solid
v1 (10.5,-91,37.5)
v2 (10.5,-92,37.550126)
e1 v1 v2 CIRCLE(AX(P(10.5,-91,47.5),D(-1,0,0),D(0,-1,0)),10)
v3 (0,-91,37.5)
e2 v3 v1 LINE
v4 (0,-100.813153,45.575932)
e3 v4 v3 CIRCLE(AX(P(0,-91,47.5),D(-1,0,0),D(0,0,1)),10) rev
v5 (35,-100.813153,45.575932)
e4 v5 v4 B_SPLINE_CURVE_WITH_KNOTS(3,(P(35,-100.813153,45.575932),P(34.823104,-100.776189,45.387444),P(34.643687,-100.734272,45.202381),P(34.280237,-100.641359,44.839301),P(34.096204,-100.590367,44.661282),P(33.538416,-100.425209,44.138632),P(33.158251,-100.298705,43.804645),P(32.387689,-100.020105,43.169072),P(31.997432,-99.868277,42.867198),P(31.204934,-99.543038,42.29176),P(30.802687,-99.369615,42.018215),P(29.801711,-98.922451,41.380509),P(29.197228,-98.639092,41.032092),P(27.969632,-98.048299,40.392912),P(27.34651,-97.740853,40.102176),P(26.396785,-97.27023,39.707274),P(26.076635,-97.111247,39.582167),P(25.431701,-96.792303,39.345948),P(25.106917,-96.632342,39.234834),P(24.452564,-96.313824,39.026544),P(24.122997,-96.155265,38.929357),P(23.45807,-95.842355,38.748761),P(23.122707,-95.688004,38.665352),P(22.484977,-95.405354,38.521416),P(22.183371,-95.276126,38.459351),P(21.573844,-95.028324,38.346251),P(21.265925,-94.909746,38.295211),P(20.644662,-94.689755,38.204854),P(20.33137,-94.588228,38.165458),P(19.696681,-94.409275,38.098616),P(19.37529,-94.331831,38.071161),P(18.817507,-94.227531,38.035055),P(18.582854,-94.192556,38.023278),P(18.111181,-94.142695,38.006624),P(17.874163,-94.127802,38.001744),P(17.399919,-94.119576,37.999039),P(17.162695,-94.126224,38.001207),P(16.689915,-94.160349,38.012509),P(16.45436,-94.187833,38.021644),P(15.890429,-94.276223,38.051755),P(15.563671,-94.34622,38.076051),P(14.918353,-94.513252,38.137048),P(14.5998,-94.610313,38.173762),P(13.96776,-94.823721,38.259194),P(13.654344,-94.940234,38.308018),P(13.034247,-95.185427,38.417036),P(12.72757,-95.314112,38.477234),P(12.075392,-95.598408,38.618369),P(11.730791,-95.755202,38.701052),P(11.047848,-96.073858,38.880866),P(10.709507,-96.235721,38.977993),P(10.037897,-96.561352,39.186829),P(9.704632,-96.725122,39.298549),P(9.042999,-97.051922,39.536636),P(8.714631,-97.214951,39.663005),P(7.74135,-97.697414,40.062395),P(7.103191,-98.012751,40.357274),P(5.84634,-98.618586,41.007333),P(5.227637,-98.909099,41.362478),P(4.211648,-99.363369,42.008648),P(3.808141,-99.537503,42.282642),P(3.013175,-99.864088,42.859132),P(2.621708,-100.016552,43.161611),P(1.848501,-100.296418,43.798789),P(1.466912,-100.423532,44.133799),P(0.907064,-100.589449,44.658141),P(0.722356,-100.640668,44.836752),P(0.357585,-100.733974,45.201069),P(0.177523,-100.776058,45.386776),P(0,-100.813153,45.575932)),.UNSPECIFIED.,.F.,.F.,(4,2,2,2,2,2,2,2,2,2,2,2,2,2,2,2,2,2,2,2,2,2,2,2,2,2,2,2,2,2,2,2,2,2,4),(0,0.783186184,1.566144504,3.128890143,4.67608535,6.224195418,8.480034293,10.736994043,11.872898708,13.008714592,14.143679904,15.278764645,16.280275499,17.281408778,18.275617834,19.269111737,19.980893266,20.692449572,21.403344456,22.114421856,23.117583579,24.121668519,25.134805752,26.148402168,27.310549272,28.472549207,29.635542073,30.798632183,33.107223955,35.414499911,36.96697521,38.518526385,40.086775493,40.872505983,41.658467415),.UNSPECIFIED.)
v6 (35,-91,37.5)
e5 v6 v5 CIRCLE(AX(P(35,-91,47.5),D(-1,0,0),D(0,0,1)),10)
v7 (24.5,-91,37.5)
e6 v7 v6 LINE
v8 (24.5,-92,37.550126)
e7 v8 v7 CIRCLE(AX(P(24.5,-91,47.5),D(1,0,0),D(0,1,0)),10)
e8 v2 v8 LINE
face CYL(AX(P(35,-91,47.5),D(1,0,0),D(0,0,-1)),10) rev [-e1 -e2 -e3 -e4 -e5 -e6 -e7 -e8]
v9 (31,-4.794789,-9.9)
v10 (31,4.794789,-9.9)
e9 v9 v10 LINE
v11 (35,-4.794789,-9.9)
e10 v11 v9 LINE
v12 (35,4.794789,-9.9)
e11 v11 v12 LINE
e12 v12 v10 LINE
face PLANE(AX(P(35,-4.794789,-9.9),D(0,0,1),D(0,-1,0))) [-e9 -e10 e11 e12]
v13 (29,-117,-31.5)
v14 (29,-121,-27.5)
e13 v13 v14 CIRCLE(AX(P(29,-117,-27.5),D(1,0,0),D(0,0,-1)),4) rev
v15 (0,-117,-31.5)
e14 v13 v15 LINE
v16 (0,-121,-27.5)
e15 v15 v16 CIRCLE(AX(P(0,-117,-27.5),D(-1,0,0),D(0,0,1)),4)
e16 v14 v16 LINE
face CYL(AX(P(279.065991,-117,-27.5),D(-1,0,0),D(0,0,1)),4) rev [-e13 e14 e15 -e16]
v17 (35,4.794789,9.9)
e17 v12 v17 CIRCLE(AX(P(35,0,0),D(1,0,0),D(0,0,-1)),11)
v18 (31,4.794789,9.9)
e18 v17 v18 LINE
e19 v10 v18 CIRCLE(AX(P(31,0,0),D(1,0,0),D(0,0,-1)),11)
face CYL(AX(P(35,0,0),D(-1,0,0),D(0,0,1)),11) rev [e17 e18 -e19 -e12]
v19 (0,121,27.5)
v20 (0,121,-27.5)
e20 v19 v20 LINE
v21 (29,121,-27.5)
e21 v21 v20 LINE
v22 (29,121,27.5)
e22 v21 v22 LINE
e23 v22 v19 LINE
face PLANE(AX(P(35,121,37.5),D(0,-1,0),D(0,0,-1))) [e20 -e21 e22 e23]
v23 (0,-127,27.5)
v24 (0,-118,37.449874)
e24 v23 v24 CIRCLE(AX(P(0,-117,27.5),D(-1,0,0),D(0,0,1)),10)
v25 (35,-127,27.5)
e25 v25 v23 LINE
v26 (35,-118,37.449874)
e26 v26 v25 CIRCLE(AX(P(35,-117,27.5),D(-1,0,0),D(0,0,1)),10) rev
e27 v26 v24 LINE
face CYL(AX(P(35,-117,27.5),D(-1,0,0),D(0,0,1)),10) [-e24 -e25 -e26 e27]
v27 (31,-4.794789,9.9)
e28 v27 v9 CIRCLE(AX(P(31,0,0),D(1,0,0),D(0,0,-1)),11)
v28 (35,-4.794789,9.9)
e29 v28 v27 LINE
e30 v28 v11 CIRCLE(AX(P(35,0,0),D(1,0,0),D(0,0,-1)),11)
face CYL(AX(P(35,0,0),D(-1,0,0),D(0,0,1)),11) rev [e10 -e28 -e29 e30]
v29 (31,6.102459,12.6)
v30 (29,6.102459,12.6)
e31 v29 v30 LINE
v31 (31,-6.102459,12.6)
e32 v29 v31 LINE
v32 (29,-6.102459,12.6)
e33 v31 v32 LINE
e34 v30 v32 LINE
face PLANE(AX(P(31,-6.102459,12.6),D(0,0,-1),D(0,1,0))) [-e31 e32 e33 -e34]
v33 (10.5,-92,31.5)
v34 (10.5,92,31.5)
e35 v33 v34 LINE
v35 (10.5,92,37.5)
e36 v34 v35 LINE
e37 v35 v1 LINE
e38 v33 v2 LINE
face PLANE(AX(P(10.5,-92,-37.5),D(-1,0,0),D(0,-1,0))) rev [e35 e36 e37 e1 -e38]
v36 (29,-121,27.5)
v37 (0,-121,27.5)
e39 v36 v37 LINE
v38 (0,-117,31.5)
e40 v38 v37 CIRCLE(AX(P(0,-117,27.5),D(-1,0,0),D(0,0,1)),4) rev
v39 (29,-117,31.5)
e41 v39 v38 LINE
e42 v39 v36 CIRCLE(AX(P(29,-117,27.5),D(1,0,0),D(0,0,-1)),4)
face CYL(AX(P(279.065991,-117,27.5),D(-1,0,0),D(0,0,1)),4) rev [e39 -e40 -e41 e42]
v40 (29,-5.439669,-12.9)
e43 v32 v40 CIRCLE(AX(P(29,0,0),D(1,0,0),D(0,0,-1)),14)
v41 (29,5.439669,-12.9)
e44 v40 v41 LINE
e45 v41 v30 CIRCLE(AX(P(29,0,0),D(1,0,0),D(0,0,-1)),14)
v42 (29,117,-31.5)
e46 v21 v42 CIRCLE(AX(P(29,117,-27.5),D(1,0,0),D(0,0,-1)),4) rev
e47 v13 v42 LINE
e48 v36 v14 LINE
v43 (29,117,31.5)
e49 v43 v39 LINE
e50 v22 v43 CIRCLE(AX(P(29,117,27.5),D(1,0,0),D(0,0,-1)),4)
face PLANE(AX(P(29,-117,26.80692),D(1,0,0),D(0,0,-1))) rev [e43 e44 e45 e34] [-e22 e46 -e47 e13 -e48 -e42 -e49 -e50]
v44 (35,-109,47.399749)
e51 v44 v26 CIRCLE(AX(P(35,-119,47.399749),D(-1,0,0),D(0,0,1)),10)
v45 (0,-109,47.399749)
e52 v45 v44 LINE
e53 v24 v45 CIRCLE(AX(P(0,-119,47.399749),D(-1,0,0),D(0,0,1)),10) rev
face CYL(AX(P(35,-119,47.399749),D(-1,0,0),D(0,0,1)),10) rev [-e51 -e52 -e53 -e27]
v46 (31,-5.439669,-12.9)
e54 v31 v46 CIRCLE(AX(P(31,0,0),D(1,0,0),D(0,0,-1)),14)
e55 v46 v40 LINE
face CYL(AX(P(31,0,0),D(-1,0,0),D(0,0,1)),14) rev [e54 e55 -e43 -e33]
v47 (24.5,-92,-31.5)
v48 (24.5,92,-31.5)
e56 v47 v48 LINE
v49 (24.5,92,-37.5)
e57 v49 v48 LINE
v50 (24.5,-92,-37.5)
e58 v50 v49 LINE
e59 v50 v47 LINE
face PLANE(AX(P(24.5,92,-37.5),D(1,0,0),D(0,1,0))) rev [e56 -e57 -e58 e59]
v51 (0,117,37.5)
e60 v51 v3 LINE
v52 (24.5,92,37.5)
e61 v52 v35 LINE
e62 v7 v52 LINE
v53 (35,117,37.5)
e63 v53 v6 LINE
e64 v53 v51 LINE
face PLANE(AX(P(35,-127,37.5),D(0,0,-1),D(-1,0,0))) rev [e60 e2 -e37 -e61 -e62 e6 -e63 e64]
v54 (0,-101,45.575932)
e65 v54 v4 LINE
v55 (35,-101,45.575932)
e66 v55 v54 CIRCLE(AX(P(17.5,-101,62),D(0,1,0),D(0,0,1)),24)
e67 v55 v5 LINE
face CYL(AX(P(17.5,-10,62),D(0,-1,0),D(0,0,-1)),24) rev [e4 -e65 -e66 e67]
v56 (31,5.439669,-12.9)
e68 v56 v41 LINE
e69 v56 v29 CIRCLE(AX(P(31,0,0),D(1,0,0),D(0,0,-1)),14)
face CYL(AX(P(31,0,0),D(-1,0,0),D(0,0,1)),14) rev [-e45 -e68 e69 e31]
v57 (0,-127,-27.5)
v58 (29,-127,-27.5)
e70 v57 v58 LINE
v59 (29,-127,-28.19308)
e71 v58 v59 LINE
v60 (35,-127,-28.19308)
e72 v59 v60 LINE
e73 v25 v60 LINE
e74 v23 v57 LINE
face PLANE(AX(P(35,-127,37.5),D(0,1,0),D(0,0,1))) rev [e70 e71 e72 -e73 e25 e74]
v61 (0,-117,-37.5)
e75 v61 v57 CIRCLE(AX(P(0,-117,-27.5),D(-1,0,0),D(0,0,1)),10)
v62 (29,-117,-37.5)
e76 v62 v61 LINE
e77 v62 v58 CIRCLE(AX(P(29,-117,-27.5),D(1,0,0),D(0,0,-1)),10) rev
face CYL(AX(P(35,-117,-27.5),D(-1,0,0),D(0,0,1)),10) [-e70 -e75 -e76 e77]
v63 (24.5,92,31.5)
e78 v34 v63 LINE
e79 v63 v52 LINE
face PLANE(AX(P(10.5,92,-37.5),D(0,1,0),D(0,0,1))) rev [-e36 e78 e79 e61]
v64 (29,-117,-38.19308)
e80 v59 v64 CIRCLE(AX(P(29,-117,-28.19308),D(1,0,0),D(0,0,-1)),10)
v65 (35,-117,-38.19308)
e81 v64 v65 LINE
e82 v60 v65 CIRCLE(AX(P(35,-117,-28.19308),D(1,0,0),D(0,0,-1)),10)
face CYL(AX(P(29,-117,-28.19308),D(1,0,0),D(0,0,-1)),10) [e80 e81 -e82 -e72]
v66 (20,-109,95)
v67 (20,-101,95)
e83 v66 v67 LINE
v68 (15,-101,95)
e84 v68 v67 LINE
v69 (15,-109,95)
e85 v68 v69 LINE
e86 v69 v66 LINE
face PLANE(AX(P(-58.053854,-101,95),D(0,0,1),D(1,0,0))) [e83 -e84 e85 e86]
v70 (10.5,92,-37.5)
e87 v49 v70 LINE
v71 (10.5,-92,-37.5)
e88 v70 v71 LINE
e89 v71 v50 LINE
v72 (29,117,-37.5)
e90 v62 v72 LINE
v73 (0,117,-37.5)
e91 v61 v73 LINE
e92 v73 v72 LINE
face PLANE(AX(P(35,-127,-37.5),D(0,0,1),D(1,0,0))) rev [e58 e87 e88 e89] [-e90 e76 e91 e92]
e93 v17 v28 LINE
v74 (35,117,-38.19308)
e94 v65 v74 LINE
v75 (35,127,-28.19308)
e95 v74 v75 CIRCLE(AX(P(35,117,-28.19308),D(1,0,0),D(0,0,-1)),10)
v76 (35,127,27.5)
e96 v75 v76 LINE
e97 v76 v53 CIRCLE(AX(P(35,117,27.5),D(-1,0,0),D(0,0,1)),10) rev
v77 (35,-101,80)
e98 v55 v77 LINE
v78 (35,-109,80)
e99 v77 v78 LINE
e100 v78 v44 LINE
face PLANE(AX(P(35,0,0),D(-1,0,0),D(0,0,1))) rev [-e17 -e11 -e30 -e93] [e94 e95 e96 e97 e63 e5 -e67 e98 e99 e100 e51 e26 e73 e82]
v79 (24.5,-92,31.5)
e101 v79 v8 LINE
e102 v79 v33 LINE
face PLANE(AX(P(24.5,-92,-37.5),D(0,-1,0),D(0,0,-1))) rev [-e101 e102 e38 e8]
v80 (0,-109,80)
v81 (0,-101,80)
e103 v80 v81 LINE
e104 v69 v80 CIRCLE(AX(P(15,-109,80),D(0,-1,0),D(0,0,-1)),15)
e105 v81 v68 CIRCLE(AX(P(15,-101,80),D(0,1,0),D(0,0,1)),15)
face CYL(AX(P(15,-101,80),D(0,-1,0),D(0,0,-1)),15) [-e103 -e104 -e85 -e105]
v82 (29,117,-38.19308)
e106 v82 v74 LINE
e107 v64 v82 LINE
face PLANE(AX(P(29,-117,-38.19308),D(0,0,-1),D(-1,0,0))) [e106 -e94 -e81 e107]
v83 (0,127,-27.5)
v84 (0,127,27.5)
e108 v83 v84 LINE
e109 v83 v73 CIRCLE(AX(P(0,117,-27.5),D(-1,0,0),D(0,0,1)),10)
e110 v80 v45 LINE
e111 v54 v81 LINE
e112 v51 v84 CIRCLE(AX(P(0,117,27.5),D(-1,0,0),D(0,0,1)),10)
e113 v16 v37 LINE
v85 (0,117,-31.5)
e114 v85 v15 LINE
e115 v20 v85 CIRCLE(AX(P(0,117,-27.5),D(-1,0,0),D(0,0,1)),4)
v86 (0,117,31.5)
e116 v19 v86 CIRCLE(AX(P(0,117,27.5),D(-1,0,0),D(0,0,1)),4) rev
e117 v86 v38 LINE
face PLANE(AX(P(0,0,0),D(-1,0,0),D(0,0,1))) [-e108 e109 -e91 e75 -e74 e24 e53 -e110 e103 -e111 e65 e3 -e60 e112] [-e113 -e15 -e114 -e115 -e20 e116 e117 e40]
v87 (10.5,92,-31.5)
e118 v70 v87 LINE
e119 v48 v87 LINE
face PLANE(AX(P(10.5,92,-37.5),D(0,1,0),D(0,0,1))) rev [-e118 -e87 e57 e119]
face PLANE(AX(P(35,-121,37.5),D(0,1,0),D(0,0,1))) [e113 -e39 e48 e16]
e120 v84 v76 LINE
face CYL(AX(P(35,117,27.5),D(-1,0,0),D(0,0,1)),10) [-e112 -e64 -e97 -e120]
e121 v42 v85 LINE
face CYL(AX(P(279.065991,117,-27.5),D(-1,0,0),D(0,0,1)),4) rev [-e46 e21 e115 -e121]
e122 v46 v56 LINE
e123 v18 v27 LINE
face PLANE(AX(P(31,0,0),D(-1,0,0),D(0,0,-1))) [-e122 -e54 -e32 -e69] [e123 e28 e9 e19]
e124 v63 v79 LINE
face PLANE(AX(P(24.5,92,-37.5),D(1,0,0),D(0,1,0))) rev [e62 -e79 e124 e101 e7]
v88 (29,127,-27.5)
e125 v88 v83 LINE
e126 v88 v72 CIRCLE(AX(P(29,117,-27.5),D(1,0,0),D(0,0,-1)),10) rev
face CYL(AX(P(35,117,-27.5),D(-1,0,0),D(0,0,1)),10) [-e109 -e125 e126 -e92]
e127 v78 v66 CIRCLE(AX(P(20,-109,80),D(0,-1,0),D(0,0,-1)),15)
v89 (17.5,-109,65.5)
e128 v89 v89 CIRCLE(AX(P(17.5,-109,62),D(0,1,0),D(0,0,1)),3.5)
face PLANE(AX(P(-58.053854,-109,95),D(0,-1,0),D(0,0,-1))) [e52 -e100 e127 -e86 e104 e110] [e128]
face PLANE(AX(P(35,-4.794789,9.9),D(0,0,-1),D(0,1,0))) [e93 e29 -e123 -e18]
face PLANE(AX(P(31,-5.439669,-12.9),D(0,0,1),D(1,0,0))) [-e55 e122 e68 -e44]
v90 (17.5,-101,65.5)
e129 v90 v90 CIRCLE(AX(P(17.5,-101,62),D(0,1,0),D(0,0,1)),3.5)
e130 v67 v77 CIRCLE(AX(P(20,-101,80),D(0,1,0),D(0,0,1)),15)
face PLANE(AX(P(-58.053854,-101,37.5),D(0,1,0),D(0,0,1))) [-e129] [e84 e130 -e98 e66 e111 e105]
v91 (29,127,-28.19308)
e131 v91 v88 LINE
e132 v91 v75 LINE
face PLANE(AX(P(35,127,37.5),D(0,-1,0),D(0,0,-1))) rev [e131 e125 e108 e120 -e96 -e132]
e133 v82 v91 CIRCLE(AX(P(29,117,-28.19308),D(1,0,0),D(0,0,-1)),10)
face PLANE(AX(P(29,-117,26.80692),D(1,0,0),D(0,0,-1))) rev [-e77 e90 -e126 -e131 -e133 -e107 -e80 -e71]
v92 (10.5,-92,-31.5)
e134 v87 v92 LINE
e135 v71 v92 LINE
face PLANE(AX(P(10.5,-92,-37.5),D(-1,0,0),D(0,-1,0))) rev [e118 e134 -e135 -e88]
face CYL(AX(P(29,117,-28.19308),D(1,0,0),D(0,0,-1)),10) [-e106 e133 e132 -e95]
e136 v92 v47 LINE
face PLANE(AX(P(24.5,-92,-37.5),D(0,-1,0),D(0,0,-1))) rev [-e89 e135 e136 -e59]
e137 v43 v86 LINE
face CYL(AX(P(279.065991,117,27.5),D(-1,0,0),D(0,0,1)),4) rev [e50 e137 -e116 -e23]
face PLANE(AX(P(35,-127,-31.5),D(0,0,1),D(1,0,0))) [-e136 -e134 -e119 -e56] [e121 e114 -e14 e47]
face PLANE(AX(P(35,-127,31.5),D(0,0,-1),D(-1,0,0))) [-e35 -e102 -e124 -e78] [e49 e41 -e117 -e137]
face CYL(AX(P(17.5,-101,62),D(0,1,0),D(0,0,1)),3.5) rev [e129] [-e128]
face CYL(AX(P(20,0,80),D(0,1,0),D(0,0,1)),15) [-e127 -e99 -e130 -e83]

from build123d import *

# Parameters (mm, degrees)
SKETCH3_W                 = 75
SKETCH3_H                 = 254
BOSS_EXTRUDE2_DEPTH       = 35
SHELL2_T                  = -6
CUT_EXTRUDE1_DEPTH        = 2
CUT_EXTRUDE2_DEPTH        = 137.000919115
SKETCH6_W                 = 14
SKETCH6_H                 = 184
CUT_EXTRUDE3_DEPTH        = 152.58825812
FILLET1_R                 = 10
FILLET2_R                 = 5
SKETCH12_W                = 57.5
SKETCH12_H                = 8
BOSS_EXTRUDE4_DEPTH       = 35
FILLET5_R                 = 10
FILLET6_R                 = 15
M8X1_0_TAPPED_HOLE1_D     = 7
M8X1_0_TAPPED_HOLE1_DEPTH = 8
M8X1_0_TAPPED_HOLE1_TIP   = 2.103012167
SKETCH16_R                = 24
CUT_EXTRUDE4_DEPTH        = 91
BOSS_EXTRUDE5_DEPTH       = 6
CUT_EXTRUDE5_DEPTH        = 29


with BuildPart() as part:
    # Sketch3 → Boss-Extrude2 (new body)
    with BuildSketch(Plane(origin=(0, 0, 0), x_dir=(0, 0, -1), z_dir=(1, 0, 0))):
        Rectangle(SKETCH3_W, SKETCH3_H)
    extrude(amount=BOSS_EXTRUDE2_DEPTH)

    # Shell2
    shell2_openings = [part.faces().sort_by_distance(p)[0] for p in [
        (35, 0, 0),
    ]]
    offset(amount=SHELL2_T, openings=shell2_openings, kind=Kind.INTERSECTION)

    # Sketch4 → Cut-Extrude1 (cut)
    with BuildSketch(Plane(origin=(6, 0, 0), x_dir=(0, 0, -1), z_dir=(1, 0, 0))):
        with BuildLine():
            Line((12.9, -5.439669108), (12.9, 5.439669108))
            ThreePointArc((12.9, 5.439669108), (0.363761531, 13.9952734), (-12.6, 6.102458521))
            Line((-12.6, 6.102458521), (-12.6, -6.102458521))
            ThreePointArc((-12.6, -6.102458521), (0.363761531, -13.9952734), (12.9, -5.439669108))
        make_face()
    cut_extrude1 = extrude(amount=-CUT_EXTRUDE1_DEPTH, mode=Mode.SUBTRACT)

    # Sketch5 → Cut-Extrude2 (cut, through all)
    with BuildSketch(Plane(origin=(4, 0, 0), x_dir=(0, 0, -1), z_dir=(1, 0, 0))):
        with BuildLine():
            Line((9.9, -4.794788838), (9.9, 4.794788838))
            ThreePointArc((9.9, 4.794788838), (0, 11), (-9.9, 4.794788838))
            Line((-9.9, 4.794788838), (-9.9, -4.794788838))
            ThreePointArc((-9.9, -4.794788838), (0, -11), (9.9, -4.794788838))
        make_face()
    cut_extrude2 = extrude(amount=-CUT_EXTRUDE2_DEPTH, mode=Mode.SUBTRACT)

    # Sketch6 → Cut-Extrude3 (cut, through all)
    with BuildSketch(Plane.XY.offset(37.5)):
        with Locations((17.5, 0)):
            Rectangle(SKETCH6_W, SKETCH6_H)
    extrude(amount=-CUT_EXTRUDE3_DEPTH, mode=Mode.SUBTRACT)

    # Fillet1
    fillet1_edges = [part.edges().sort_by_distance(p)[0] for p in [
        (17.5, -127, -37.5),
        (17.5, -127, 37.5),
        (17.5, 127, 37.5),
        (17.5, 127, -37.5),
    ]]
    fillet(fillet1_edges, radius=FILLET1_R)

    # Fillet2
    fillet2_edges = [part.edges().sort_by_distance(p)[0] for p in [
        (20.5, -121, -31.5),
        (20.5, 121, -31.5),
        (20.5, 121, 31.5),
        (20.5, -121, 31.5),
    ]]
    fillet(fillet2_edges, radius=FILLET2_R)

    # Sketch12 → Boss-Extrude4 (add)
    with BuildSketch(Plane(origin=(35, 0, 0), x_dir=(0, 0, -1), z_dir=(1, 0, 0))):
        with Locations((-66.25, -105)):
            Rectangle(SKETCH12_W, SKETCH12_H)
    extrude(amount=-BOSS_EXTRUDE4_DEPTH)

    # Fillet5
    # the kernel refuses this fillet: 10 mm, written as the material it adds along each edge
    with BuildSketch(Plane(origin=(35, -109, 37.5), x_dir=(0, -0.9999844906159053, -0.0055694279462415305), z_dir=(-1, 0, 0))) as fillet5_piece_1:
        with BuildLine():
            CenterArc((9.944708969, 9.955289483), FILLET5_R, 180.319106365, 84.260829523)
            Line((-0.055135937, 9.899595203), (-1.055120428, 9.894025775))
            Line((-1.055120428, 9.894025775), (-0.999984491, -0.005569428))
            Line((-0.999984491, -0.005569428), (0.005569428, -0.999984491))
            ThreePointArc((0.005569428, -0.999984491), (8.005445353, -0.955429067), (8.905682648, -0.995528948))
            Line((8.905682648, -0.995528948), (9.000139587, 0))
        make_face()
    extrude(amount=35)
    with BuildSketch(Plane(origin=(35, -101, 37.5), x_dir=(0, 1, 0), z_dir=(-1, 0, 0))) as fillet5_piece_2_section:
        with BuildLine():
            CenterArc((FILLET5_R, -FILLET5_R), FILLET5_R, 90, 90)
            Line((0, -FILLET5_R), (0, 0))
            Line((0, 0), (FILLET5_R, 0))
        make_face()
    fillet5_piece_2 = extrude(amount=35, mode=Mode.PRIVATE)
    fillet5_piece_2 = split(fillet5_piece_2, bisect_by=Plane(origin=(29.75, -92, 37.408860849), z_dir=(0, 1, 0)), keep=Keep.TOP, mode=Mode.PRIVATE)
    fillet5_piece_2 = split(fillet5_piece_2, bisect_by=Plane(origin=(24.5, -91.519267155, 37.408860849), z_dir=(1, 0, 0)), keep=Keep.TOP, mode=Mode.PRIVATE)
    add(fillet5_piece_2)
    with BuildSketch(Plane(origin=(35, -101, 37.5), x_dir=(0, 1, 0), z_dir=(-1, 0, 0))) as fillet5_piece_3_section:
        with BuildLine():
            CenterArc((FILLET5_R, -FILLET5_R), FILLET5_R, 90, 90)
            Line((0, -FILLET5_R), (0, 0))
            Line((0, 0), (FILLET5_R, 0))
        make_face()
    fillet5_piece_3 = extrude(amount=35, mode=Mode.PRIVATE)
    fillet5_piece_3 = split(fillet5_piece_3, bisect_by=Plane(origin=(29.75, -92, 39.784135406), z_dir=(0, -1, 0)), keep=Keep.TOP, mode=Mode.PRIVATE)
    fillet5_piece_3 = split(fillet5_piece_3, bisect_by=Plane(origin=(24.5, -98.797900168, 39.784135406), z_dir=(1, 0, 0)), keep=Keep.TOP, mode=Mode.PRIVATE)
    add(fillet5_piece_3)
    with BuildSketch(Plane(origin=(35, -101, 37.5), x_dir=(0, 1, 0), z_dir=(-1, 0, 0))) as fillet5_piece_4_section:
        with BuildLine():
            CenterArc((FILLET5_R, -FILLET5_R), FILLET5_R, 90, 90)
            Line((0, -FILLET5_R), (0, 0))
            Line((0, 0), (FILLET5_R, 0))
        make_face()
    fillet5_piece_4 = extrude(amount=35, mode=Mode.PRIVATE)
    fillet5_piece_4 = split(fillet5_piece_4, bisect_by=Plane(origin=(10.5, -98.797900168, 39.784135406), z_dir=(1, 0, 0)), keep=Keep.TOP, mode=Mode.PRIVATE)
    fillet5_piece_4 = split(fillet5_piece_4, bisect_by=Plane(origin=(17.5, -92, 39.784135406), z_dir=(0, -1, 0)), keep=Keep.TOP, mode=Mode.PRIVATE)
    fillet5_piece_4 = split(fillet5_piece_4, bisect_by=Plane(origin=(24.5, -98.797900168, 39.784135406), z_dir=(-1, 0, 0)), keep=Keep.TOP, mode=Mode.PRIVATE)
    add(fillet5_piece_4)
    with BuildSketch(Plane(origin=(35, -101, 37.5), x_dir=(0, 1, 0), z_dir=(-1, 0, 0))) as fillet5_piece_5_section:
        with BuildLine():
            CenterArc((FILLET5_R, -FILLET5_R), FILLET5_R, 90, 90)
            Line((0, -FILLET5_R), (0, 0))
            Line((0, 0), (FILLET5_R, 0))
        make_face()
    fillet5_piece_5 = extrude(amount=35, mode=Mode.PRIVATE)
    fillet5_piece_5 = split(fillet5_piece_5, bisect_by=Plane(origin=(10.5, -91.519267155, 37.408860849), z_dir=(-1, 0, 0)), keep=Keep.TOP, mode=Mode.PRIVATE)
    fillet5_piece_5 = split(fillet5_piece_5, bisect_by=Plane(origin=(5.25, -92, 37.408860849), z_dir=(0, 1, 0)), keep=Keep.TOP, mode=Mode.PRIVATE)
    add(fillet5_piece_5)
    with BuildSketch(Plane(origin=(35, -101, 37.5), x_dir=(0, 1, 0), z_dir=(-1, 0, 0))) as fillet5_piece_6_section:
        with BuildLine():
            CenterArc((FILLET5_R, -FILLET5_R), FILLET5_R, 90, 90)
            Line((0, -FILLET5_R), (0, 0))
            Line((0, 0), (FILLET5_R, 0))
        make_face()
    fillet5_piece_6 = extrude(amount=35, mode=Mode.PRIVATE)
    fillet5_piece_6 = split(fillet5_piece_6, bisect_by=Plane(origin=(10.5, -98.797900168, 39.784135406), z_dir=(-1, 0, 0)), keep=Keep.TOP, mode=Mode.PRIVATE)
    fillet5_piece_6 = split(fillet5_piece_6, bisect_by=Plane(origin=(5.25, -92, 39.784135406), z_dir=(0, -1, 0)), keep=Keep.TOP, mode=Mode.PRIVATE)
    add(fillet5_piece_6)

    # Fillet6
    fillet6_edges = [part.edges().sort_by_distance(p)[0] for p in [
        (35, -105, 95),
        (0, -105, 95),
    ]]
    fillet(fillet6_edges, radius=FILLET6_R)

    # M8x1.0 Tapped Hole1
    with Locations(Plane(origin=(17.5, -101, 62), x_dir=(0, 0, 1), z_dir=(0, 1, 0))):
        with Locations((0, 0)):
            Hole(M8X1_0_TAPPED_HOLE1_D / 2, depth=M8X1_0_TAPPED_HOLE1_DEPTH)
            with Locations((0, 0, -(M8X1_0_TAPPED_HOLE1_DEPTH + M8X1_0_TAPPED_HOLE1_TIP / 2))):  # 118° drill point
                Cone(0, M8X1_0_TAPPED_HOLE1_D / 2, M8X1_0_TAPPED_HOLE1_TIP, mode=Mode.SUBTRACT)

    # Sketch16 → Cut-Extrude4 (cut)
    with BuildSketch(Plane(origin=(0, -101, 0), x_dir=(1, 0, 0), z_dir=(0, 1, 0))):
        with Locations((17.5, -62)):
            Circle(SKETCH16_R)
    extrude(amount=CUT_EXTRUDE4_DEPTH, mode=Mode.SUBTRACT)

    # Sketch17 → Boss-Extrude5 (add)
    with BuildSketch(Plane(origin=(35, 0, 0), x_dir=(0, 0, -1), z_dir=(1, 0, 0))):
        with BuildLine():
            Line((-26.806920407, -127), (28.193079593, -127))
            ThreePointArc((28.193079593, -127), (35.264147405, -124.071067812), (38.193079593, -117))
            Line((38.193079593, -117), (38.193079593, 117))
            ThreePointArc((38.193079593, 117), (35.264147405, 124.071067812), (28.193079593, 127))
            Line((28.193079593, 127), (-26.806920527, 127))
            ThreePointArc((-26.806920527, 127), (-33.878742431, 124.070313639), (-36.806920299, 116.997866992))
            Line((-36.806920299, 116.997866992), (-36.756795058, -117.999997222))
            ThreePointArc((-36.756795058, -117.999997222), (-33.515125375, -124.416197551), (-26.806920407, -127))
        make_face()
    extrude(amount=-BOSS_EXTRUDE5_DEPTH)

    # Mirror1: Cut-Extrude1, Cut-Extrude2 across plane
    add(cut_extrude1.mirror(Plane.ZY.offset(-17.5)), mode=Mode.SUBTRACT)
    add(cut_extrude2.mirror(Plane.ZY.offset(-17.5)), mode=Mode.SUBTRACT)

    # Sketch18 → Cut-Extrude5 (cut)
    with BuildSketch(Plane.ZY):
        with BuildLine():
            ThreePointArc((31.5, 117), (30.328427125, 119.828427125), (27.5, 121))
            Line((27.5, 121), (-27.5, 121))
            ThreePointArc((-27.5, 121), (-30.328427125, 119.828427125), (-31.5, 117))
            Line((-31.5, 117), (-31.5, -117))
            ThreePointArc((-31.5, -117), (-30.328427125, -119.828427125), (-27.5, -121))
            Line((-27.5, -121), (27.5, -121))
            ThreePointArc((27.5, -121), (30.328427125, -119.828427125), (31.5, -117))
            Line((31.5, -117), (31.5, 117))
        make_face()
        with BuildLine():
            Line((-9.9, -4.794788838), (-9.9, 4.794788838))
            ThreePointArc((-9.9, 4.794788838), (0, 11), (9.9, 4.794788838))
            Line((9.9, 4.794788838), (9.9, -4.794788838))
            ThreePointArc((9.9, -4.794788838), (0, -11), (-9.9, -4.794788838))
        make_face(mode=Mode.SUBTRACT)
    extrude(amount=-CUT_EXTRUDE5_DEPTH, mode=Mode.SUBTRACT)


solid = part.part
